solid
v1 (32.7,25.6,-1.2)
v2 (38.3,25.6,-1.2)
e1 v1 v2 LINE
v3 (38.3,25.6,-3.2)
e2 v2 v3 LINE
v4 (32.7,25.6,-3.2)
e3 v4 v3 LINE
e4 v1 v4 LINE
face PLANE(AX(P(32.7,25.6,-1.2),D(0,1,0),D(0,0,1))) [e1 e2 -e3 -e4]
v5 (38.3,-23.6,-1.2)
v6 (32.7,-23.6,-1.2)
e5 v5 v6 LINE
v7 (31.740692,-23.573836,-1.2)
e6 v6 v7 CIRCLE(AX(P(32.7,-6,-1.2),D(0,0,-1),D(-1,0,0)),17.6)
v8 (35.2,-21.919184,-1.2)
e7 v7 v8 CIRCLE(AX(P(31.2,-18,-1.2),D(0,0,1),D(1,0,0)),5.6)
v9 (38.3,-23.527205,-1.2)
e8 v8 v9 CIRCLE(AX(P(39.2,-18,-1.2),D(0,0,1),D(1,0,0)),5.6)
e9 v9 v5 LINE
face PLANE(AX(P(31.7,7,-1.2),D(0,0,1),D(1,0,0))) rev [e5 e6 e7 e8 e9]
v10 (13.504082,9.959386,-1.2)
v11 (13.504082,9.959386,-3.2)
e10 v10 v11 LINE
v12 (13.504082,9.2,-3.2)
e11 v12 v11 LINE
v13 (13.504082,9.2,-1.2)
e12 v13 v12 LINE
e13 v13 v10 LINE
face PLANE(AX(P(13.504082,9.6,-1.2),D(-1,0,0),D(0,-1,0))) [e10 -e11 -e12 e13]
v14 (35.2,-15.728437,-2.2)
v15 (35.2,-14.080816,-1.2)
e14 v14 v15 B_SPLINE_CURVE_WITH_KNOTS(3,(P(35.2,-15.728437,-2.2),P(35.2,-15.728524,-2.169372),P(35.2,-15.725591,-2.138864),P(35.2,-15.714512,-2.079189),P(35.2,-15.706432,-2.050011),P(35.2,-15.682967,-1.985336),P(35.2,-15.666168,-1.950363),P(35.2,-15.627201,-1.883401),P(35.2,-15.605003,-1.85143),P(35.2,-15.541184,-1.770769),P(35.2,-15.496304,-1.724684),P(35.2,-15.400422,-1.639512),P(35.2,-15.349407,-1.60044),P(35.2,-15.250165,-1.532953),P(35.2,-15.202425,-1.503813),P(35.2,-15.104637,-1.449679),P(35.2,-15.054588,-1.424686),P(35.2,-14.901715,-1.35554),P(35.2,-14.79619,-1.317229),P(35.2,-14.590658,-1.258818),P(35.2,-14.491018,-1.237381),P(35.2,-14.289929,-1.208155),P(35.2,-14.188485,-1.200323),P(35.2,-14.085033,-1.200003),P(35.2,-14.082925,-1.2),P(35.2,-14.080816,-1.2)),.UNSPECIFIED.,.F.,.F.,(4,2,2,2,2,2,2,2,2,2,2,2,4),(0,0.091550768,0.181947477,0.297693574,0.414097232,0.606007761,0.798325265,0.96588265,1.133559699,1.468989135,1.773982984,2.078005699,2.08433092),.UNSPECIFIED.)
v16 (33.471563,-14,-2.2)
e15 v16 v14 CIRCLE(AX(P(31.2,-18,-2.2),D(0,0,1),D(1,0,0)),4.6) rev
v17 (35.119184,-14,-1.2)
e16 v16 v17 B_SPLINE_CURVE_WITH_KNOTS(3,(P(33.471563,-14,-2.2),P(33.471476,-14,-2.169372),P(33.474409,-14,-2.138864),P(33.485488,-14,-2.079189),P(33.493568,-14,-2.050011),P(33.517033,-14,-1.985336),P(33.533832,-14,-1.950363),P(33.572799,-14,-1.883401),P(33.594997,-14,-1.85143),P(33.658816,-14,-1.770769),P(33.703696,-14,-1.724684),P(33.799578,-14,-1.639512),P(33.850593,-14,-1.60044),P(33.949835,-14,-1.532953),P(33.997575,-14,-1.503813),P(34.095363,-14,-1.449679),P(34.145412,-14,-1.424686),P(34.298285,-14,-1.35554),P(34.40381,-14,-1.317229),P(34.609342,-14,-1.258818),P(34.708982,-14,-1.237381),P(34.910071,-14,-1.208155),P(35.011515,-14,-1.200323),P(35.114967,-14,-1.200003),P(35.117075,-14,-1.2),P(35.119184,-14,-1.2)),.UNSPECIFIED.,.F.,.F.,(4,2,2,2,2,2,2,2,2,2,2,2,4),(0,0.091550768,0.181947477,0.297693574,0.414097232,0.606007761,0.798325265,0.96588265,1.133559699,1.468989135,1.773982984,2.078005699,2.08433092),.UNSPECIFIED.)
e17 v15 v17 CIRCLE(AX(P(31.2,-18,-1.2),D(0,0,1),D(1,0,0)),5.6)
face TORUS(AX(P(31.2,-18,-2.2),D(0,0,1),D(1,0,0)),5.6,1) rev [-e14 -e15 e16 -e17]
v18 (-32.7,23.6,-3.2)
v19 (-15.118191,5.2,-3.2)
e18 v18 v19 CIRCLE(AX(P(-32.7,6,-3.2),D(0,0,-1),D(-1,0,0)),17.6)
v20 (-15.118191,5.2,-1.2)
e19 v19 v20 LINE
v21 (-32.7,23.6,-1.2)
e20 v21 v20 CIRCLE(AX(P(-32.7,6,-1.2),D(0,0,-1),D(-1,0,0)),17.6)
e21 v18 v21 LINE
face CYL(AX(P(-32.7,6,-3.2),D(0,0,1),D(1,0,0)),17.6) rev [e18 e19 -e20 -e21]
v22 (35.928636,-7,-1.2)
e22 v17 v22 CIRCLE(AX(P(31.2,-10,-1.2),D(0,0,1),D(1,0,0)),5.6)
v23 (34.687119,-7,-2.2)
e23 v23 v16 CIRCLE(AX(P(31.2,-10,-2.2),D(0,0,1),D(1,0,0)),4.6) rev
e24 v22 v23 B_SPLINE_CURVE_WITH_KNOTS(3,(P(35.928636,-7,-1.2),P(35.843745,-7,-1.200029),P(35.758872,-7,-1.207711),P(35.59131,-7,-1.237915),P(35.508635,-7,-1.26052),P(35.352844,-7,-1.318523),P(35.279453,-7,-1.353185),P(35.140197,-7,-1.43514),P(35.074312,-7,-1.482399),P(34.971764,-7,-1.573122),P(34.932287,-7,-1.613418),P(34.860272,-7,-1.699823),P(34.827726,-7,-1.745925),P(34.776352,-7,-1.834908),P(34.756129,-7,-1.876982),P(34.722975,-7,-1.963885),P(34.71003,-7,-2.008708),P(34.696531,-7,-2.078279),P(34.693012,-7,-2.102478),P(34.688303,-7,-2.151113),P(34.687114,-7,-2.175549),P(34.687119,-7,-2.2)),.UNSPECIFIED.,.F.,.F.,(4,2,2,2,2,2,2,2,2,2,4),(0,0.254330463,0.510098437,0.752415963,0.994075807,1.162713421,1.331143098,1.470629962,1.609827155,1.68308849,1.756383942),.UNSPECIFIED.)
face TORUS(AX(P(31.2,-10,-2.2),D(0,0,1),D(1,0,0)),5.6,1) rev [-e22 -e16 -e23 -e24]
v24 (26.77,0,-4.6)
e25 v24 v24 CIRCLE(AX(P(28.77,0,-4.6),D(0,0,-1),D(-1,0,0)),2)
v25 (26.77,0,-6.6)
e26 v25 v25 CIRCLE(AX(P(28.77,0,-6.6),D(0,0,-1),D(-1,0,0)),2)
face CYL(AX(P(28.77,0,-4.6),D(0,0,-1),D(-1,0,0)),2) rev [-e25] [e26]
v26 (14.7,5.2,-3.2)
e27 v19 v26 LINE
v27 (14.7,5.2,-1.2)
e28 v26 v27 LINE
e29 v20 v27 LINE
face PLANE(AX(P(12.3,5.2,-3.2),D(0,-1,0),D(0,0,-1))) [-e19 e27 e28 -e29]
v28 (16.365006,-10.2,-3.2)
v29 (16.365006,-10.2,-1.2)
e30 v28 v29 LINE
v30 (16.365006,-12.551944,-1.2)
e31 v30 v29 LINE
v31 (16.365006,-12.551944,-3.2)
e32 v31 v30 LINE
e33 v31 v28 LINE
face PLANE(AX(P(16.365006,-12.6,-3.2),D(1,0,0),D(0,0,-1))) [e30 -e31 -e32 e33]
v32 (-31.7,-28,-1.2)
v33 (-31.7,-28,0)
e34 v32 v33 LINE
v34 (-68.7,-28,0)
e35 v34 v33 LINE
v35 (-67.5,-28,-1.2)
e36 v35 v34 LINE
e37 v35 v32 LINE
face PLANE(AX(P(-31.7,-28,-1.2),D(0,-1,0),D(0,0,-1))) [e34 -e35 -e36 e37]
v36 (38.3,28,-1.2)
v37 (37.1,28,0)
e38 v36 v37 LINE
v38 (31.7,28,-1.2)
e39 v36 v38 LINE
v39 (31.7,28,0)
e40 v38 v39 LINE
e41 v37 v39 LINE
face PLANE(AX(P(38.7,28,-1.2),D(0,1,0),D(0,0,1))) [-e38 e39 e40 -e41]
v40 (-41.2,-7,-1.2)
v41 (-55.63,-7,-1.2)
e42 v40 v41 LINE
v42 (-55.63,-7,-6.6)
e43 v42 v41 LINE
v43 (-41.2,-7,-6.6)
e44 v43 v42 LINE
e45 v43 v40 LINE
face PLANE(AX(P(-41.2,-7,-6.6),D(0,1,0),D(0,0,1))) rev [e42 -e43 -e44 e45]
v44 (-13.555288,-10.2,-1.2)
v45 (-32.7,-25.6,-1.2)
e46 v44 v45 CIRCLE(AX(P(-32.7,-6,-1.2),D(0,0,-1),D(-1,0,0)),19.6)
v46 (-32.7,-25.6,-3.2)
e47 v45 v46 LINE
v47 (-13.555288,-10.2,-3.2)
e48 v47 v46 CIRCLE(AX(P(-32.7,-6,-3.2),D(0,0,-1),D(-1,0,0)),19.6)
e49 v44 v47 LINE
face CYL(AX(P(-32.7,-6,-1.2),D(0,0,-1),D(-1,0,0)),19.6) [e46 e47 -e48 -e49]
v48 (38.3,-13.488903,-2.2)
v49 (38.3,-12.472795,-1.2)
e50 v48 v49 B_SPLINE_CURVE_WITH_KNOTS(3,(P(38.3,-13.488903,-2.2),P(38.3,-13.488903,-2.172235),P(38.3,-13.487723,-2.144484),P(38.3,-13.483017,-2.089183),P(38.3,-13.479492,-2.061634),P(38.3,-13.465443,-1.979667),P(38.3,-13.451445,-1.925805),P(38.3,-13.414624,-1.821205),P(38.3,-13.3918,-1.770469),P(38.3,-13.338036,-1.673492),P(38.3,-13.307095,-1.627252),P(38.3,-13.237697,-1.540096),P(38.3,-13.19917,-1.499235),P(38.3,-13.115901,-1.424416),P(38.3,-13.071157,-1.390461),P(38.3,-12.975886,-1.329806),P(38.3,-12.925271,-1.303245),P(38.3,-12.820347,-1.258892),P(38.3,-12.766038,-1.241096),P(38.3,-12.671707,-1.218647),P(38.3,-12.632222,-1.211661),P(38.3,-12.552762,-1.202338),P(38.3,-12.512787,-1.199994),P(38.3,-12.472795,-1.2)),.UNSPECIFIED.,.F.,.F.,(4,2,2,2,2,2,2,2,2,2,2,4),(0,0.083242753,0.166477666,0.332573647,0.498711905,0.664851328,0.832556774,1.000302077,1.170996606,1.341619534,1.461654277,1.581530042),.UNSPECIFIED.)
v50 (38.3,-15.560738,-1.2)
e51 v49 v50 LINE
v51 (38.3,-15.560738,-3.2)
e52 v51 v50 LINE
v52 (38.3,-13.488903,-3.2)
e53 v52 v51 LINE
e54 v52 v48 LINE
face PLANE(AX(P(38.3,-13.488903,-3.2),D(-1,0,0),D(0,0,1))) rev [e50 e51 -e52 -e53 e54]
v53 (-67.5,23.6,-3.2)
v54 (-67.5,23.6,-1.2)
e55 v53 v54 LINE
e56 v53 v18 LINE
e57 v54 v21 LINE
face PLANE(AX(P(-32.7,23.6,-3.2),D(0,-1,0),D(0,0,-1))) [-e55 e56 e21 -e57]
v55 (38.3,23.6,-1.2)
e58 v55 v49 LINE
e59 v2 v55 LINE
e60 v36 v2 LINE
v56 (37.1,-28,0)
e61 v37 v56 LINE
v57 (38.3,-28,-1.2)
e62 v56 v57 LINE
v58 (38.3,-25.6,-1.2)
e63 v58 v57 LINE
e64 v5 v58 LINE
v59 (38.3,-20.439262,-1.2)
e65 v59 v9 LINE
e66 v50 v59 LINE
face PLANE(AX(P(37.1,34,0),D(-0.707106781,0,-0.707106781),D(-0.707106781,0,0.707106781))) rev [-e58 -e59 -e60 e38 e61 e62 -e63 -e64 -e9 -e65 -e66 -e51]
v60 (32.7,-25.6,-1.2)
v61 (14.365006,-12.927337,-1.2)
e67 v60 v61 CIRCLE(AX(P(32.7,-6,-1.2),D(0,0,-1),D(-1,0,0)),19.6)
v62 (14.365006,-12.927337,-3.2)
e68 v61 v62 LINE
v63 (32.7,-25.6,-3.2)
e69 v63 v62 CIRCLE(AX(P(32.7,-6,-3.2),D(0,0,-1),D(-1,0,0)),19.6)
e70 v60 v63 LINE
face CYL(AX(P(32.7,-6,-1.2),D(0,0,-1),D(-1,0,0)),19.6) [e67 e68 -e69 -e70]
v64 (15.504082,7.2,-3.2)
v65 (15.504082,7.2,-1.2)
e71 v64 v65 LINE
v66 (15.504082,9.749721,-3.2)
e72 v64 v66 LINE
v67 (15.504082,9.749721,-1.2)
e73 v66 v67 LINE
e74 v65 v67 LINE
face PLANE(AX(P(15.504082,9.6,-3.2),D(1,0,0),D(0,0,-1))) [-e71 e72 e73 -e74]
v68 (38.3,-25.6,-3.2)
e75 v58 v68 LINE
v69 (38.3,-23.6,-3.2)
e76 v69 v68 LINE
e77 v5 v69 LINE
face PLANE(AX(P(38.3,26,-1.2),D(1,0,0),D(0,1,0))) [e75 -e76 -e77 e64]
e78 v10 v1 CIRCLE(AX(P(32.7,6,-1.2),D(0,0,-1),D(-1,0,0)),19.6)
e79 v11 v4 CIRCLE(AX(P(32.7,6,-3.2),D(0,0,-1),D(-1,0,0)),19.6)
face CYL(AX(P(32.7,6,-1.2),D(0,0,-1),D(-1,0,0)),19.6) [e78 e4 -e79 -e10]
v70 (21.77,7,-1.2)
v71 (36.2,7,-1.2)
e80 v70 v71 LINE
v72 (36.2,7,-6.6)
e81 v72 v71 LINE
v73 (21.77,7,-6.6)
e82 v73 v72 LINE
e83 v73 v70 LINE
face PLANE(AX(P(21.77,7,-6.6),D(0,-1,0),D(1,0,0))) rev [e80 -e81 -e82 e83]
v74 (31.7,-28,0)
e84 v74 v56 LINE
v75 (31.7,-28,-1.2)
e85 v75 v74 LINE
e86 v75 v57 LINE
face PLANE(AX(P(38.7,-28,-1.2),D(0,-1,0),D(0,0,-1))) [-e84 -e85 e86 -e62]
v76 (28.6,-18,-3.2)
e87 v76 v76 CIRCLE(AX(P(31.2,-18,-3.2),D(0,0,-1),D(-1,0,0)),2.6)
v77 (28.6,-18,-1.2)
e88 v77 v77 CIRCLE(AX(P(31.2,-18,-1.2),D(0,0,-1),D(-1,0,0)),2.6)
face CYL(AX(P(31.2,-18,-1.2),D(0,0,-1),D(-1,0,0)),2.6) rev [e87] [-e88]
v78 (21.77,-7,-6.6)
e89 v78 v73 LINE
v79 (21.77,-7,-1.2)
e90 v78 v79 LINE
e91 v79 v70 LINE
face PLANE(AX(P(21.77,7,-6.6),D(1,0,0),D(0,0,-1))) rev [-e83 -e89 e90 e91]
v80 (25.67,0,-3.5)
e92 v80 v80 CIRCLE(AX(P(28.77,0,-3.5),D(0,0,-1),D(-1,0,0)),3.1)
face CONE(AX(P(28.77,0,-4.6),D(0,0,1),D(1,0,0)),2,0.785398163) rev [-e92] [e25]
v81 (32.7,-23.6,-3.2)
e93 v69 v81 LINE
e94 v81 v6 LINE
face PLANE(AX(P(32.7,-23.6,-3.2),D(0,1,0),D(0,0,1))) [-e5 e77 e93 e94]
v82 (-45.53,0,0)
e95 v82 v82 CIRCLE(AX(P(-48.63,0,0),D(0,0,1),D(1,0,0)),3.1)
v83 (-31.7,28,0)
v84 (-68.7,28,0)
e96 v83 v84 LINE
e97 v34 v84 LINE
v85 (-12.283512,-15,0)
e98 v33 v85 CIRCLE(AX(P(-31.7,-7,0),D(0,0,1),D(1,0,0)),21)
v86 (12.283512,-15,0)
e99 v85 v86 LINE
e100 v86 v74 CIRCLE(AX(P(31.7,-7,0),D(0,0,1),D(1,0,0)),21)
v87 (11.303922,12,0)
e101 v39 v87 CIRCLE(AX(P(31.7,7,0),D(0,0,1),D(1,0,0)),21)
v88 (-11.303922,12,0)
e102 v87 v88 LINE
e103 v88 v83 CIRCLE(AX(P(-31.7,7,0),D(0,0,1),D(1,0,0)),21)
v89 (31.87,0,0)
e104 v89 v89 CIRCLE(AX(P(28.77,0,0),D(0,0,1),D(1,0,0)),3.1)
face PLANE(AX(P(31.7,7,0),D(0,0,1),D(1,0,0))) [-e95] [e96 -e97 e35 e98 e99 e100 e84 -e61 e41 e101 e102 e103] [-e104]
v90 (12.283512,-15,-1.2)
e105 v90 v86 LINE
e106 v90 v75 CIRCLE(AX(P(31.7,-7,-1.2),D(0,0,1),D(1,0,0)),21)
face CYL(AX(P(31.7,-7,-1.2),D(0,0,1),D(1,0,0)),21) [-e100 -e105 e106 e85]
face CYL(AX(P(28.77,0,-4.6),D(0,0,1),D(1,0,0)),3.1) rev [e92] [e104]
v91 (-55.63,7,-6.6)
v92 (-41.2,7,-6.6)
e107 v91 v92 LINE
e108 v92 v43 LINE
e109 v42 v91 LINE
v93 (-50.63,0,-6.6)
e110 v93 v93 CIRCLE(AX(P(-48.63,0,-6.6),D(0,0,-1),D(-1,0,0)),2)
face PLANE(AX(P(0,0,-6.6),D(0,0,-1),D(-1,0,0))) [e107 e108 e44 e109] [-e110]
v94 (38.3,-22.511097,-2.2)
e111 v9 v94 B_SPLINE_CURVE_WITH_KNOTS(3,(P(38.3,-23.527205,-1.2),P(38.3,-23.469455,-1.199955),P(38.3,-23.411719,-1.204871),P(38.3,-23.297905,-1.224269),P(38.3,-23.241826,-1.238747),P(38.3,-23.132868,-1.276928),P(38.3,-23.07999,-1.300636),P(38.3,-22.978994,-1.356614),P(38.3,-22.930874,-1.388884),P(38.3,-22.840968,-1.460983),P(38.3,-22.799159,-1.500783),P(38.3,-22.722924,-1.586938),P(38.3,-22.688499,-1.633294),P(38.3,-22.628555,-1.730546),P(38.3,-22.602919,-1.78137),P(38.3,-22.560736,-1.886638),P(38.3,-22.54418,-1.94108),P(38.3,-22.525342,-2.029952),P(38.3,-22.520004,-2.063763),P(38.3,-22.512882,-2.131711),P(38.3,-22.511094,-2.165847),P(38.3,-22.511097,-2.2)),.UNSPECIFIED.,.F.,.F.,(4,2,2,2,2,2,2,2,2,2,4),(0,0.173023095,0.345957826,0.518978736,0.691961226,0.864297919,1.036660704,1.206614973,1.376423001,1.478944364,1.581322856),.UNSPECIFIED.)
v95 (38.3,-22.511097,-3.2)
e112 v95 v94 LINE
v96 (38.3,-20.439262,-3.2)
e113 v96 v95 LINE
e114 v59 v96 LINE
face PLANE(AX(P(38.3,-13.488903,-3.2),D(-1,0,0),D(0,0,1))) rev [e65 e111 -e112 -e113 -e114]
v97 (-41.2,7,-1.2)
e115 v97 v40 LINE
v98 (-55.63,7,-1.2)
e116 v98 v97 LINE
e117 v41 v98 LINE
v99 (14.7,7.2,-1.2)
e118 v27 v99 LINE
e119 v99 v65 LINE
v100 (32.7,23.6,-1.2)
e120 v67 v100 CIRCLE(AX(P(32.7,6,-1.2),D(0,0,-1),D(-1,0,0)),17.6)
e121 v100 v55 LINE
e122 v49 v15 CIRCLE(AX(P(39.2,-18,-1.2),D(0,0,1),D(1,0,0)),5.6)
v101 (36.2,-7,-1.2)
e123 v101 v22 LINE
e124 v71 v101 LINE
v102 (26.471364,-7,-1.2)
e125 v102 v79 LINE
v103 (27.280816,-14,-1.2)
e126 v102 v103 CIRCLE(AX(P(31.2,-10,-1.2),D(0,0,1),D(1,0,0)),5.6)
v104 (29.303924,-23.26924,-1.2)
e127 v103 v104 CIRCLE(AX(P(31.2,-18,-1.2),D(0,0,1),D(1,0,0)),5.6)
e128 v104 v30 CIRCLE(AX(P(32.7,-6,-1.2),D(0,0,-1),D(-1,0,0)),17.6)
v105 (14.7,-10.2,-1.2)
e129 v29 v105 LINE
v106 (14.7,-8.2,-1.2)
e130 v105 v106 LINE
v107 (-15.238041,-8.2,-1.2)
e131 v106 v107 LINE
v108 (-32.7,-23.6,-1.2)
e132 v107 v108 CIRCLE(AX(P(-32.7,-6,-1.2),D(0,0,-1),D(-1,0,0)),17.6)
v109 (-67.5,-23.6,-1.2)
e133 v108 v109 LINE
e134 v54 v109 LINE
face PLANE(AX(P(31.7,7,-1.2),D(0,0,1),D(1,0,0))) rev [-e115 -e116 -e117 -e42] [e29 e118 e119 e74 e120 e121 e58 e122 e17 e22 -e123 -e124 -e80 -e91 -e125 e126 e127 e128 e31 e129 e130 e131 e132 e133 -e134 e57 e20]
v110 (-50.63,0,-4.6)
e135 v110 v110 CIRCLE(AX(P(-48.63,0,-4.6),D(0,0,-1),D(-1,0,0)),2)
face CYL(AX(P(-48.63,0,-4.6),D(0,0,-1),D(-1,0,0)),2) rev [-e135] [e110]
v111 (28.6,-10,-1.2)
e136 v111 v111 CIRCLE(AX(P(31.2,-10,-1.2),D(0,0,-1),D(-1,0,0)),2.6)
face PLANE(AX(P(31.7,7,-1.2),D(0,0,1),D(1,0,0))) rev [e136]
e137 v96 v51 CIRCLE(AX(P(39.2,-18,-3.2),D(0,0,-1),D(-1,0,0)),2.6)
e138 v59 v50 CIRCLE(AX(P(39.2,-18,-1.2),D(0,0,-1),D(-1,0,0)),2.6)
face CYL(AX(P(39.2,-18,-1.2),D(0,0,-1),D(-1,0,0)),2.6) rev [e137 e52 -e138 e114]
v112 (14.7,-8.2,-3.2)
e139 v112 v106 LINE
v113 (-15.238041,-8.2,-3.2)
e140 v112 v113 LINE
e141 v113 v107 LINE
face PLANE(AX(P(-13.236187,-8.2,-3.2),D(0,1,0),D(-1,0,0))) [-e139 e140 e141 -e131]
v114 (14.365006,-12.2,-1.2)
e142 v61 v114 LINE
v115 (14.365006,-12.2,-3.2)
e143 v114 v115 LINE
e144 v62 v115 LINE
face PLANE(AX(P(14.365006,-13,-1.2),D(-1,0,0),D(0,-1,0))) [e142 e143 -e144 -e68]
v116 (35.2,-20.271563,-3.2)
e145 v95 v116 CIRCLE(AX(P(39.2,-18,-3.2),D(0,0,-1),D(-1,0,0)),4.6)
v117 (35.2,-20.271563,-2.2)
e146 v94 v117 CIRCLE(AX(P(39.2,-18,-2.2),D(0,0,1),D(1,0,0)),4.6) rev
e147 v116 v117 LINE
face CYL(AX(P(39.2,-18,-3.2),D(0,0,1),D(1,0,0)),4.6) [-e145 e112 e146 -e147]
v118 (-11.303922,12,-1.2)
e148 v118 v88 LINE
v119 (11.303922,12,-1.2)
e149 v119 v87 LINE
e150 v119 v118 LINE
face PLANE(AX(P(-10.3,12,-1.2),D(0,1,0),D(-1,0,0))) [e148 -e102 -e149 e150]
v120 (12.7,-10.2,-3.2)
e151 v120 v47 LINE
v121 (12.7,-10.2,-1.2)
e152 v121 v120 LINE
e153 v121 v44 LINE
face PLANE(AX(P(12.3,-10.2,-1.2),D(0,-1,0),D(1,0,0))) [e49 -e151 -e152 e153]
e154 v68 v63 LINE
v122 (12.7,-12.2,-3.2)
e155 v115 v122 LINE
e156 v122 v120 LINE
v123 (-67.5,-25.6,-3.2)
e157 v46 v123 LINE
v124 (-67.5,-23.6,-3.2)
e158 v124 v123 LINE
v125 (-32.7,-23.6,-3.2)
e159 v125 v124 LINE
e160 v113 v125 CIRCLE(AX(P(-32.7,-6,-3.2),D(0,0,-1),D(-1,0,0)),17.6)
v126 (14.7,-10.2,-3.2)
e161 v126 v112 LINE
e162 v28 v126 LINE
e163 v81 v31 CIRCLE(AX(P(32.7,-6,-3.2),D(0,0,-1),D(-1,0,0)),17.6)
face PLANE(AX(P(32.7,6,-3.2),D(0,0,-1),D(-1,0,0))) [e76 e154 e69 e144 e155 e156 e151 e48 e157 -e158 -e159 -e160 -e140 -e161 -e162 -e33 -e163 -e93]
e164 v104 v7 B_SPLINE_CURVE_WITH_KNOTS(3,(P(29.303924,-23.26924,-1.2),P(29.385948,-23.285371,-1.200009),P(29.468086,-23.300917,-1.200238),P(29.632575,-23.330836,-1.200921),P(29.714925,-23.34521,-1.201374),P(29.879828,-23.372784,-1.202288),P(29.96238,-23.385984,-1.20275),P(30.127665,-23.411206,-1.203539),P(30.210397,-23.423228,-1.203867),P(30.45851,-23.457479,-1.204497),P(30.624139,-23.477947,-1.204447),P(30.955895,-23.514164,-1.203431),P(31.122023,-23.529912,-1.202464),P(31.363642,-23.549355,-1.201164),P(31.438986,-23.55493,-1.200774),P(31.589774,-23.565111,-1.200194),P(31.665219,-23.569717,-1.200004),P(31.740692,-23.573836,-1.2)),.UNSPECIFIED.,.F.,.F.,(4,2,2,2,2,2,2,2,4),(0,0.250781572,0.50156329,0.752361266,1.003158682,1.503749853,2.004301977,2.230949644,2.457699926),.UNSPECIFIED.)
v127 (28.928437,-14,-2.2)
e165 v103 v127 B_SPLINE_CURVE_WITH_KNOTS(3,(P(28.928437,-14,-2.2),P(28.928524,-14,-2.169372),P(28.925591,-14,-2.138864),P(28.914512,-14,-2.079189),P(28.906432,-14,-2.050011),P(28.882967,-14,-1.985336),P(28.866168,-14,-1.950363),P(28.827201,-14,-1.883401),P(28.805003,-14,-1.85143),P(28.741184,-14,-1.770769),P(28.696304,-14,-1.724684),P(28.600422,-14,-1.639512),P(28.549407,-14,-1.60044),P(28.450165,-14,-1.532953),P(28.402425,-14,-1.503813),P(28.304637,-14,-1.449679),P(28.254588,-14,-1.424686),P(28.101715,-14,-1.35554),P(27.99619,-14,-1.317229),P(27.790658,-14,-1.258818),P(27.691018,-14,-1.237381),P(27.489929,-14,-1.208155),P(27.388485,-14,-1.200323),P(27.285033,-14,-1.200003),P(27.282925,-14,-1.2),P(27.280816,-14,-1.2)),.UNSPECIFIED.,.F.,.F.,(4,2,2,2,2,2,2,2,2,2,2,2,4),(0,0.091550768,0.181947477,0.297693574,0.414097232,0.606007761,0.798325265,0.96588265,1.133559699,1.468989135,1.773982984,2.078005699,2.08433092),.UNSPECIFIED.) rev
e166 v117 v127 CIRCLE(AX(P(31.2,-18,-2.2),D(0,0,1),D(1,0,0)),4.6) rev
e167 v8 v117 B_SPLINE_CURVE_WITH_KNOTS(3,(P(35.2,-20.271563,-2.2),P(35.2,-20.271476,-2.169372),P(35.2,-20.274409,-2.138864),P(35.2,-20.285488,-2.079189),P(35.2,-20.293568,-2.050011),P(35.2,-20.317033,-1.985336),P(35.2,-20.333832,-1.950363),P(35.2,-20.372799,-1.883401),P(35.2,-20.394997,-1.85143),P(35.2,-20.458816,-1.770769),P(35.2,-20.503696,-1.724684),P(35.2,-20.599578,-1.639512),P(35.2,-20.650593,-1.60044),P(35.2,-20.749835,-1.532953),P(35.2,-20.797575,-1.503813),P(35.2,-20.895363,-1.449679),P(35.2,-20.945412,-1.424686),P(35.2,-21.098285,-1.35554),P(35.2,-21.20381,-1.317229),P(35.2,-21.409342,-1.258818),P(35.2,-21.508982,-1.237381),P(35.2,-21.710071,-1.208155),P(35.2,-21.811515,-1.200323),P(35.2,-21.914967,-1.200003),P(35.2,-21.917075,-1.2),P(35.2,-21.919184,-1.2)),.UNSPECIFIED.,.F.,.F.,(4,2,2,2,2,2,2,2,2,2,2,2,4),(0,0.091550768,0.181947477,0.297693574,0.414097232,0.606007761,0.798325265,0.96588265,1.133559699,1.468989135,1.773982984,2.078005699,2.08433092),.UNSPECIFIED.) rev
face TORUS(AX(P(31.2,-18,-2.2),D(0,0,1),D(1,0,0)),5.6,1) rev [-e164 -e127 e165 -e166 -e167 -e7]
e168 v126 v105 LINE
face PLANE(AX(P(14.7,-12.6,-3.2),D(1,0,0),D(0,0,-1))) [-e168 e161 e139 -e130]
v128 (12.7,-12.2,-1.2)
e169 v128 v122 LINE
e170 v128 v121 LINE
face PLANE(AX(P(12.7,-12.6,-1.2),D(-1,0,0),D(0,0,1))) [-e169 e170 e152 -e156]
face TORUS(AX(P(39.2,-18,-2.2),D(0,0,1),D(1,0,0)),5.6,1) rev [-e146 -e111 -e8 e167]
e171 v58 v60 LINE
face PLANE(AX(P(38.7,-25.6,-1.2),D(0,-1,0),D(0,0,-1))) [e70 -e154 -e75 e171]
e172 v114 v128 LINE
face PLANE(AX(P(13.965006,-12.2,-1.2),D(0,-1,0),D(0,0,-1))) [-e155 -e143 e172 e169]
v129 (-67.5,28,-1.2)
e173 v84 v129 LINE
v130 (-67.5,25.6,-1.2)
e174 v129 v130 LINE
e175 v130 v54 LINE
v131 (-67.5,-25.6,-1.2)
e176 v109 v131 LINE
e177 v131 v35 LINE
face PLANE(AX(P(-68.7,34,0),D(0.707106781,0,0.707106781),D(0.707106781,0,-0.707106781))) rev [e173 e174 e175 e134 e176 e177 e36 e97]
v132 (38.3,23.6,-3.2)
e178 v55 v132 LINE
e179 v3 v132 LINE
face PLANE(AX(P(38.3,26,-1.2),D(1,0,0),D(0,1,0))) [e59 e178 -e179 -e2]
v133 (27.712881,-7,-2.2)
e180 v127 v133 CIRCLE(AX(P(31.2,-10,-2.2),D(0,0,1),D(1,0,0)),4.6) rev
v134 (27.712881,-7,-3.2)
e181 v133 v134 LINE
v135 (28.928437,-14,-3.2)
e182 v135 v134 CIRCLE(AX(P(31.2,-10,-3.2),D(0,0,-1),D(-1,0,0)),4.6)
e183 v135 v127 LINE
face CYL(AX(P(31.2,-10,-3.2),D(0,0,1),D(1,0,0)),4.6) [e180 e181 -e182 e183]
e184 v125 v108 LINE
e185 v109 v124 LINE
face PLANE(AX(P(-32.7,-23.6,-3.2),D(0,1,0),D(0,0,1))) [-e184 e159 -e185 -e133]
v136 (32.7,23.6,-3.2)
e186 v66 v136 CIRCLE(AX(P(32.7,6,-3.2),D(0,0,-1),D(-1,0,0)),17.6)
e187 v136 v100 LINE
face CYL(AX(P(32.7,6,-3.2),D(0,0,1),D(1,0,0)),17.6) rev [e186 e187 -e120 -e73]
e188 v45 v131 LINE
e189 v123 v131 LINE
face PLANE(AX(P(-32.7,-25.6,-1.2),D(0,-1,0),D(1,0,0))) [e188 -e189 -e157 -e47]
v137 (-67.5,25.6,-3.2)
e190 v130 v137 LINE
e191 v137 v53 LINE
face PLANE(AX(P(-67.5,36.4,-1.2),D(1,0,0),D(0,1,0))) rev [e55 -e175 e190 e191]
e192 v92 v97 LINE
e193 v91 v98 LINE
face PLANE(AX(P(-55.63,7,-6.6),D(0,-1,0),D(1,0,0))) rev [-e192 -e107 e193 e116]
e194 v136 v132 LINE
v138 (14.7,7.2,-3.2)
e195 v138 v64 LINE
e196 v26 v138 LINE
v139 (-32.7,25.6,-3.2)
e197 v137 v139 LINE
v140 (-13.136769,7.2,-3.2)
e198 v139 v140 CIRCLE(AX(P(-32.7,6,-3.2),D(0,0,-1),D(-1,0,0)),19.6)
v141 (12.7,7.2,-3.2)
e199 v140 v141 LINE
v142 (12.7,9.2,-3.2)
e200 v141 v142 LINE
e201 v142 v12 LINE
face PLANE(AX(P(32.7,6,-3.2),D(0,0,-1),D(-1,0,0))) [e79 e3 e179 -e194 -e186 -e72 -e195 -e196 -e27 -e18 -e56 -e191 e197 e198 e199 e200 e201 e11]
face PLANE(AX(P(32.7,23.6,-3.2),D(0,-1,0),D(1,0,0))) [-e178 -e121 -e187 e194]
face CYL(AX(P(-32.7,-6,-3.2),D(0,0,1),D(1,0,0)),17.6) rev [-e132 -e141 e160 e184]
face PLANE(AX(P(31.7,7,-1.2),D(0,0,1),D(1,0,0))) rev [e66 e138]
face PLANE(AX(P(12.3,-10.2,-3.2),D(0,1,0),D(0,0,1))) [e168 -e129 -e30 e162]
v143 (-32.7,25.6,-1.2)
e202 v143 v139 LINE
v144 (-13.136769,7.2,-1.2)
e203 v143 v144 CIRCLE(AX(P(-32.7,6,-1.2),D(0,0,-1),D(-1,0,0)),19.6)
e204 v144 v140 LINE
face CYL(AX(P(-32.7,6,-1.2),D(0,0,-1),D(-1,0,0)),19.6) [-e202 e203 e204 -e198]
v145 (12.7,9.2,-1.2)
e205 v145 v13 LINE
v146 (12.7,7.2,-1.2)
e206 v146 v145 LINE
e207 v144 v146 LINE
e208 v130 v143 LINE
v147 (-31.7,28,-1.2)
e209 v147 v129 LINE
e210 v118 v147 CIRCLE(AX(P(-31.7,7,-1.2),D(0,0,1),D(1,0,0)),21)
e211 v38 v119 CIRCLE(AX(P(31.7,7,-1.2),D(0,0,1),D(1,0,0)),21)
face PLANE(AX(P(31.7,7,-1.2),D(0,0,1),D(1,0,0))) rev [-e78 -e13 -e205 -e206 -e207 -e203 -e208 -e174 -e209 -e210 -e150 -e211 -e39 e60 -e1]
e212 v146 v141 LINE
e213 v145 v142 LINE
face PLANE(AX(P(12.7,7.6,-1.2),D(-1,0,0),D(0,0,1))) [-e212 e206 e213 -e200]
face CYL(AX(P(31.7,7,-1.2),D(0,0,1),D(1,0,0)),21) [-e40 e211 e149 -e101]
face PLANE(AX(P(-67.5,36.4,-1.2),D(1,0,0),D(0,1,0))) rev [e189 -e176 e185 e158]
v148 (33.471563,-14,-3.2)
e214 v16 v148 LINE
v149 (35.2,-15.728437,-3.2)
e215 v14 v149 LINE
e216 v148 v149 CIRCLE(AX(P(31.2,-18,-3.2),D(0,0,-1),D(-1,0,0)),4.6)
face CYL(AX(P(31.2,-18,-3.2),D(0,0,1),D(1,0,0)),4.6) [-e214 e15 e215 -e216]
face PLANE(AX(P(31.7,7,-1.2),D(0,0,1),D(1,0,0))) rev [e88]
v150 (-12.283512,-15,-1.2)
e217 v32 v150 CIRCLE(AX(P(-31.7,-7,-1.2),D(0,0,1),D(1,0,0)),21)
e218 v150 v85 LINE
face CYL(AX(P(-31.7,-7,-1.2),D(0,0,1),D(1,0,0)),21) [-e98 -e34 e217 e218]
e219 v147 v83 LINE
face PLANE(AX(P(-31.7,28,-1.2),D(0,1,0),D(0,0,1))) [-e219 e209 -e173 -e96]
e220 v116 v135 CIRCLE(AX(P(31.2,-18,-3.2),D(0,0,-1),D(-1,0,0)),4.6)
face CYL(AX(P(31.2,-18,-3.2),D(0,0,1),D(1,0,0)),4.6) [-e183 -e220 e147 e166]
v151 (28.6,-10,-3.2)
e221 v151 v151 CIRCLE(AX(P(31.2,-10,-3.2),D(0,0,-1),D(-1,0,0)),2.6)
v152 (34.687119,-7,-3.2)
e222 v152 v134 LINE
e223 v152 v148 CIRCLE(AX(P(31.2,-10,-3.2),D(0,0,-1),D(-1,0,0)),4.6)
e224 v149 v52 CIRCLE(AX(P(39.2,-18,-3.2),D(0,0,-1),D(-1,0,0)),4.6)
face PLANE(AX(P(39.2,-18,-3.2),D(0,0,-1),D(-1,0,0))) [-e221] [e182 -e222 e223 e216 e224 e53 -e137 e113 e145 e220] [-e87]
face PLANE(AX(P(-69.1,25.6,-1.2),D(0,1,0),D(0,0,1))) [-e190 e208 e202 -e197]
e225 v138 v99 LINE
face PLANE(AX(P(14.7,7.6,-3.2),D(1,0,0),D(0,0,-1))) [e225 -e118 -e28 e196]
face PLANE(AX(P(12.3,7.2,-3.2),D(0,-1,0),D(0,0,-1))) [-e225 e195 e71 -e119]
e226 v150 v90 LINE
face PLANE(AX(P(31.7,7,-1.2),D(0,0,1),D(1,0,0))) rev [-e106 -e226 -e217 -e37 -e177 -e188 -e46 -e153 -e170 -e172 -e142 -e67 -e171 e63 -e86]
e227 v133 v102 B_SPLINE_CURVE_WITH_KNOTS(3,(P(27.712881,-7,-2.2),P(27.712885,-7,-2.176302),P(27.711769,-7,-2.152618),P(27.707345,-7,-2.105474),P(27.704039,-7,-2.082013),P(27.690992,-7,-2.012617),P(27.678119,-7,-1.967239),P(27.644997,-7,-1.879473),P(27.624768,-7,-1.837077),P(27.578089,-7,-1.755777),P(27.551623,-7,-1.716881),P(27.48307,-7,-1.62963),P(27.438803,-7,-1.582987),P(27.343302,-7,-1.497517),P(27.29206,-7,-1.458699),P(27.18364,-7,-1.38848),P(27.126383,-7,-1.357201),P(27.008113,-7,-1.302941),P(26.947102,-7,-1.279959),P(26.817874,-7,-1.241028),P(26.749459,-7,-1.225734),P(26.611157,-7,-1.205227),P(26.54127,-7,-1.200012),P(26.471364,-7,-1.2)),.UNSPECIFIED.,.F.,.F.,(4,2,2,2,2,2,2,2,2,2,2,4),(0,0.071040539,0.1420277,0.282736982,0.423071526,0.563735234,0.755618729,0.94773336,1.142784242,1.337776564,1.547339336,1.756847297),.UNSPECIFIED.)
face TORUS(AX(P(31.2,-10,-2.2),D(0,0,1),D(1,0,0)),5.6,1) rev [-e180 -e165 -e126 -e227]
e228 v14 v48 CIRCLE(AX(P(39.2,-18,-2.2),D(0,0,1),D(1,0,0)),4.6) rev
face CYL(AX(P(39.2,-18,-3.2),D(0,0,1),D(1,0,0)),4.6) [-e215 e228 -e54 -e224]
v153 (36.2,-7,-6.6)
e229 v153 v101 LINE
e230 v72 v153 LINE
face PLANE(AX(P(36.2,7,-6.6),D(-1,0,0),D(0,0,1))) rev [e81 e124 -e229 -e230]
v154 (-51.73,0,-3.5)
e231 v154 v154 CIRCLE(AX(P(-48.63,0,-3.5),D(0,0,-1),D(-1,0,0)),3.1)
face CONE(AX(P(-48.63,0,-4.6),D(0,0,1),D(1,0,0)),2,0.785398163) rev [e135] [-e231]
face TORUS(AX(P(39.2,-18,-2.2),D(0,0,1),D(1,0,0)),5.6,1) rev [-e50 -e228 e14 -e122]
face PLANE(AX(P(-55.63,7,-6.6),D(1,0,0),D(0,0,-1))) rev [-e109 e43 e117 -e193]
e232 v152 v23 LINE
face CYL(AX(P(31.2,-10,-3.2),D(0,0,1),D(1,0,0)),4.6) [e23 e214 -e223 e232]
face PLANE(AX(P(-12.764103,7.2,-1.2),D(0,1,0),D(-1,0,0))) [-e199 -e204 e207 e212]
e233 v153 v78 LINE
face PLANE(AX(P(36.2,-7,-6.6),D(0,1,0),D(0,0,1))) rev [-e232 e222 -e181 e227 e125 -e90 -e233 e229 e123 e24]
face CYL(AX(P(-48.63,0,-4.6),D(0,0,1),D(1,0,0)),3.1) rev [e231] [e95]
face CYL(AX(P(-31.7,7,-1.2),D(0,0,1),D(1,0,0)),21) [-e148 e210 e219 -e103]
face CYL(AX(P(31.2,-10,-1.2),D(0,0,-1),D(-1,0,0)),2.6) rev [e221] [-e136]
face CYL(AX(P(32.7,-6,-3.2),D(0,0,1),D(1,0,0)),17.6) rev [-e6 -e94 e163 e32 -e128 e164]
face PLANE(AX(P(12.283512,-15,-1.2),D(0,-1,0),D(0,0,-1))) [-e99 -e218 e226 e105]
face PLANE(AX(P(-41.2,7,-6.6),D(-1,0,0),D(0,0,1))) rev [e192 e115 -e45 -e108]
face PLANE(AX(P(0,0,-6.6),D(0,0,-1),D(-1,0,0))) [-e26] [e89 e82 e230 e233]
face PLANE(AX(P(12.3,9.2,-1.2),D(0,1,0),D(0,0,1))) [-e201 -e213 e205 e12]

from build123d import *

# Parameters (mm, degrees)
SKETCH_2_R            = 2.6
EXTRUDE_1_DEPTH       = 1.2
EXTRUDE_1_2_DEPTH     = 2
CUT_EXTRUDE_START     = -2
CUT_EXTRUDE_1_DEPTH   = 2
SKETCH_5_W            = 2
SKETCH_5_H            = 47.2
CUT_EXTRUDE_1_2_DEPTH = 2
SKETCH_6_W            = 14.43
SKETCH_6_H            = 14
SKETCH_6_R            = 2.6
EXTRUDE_2_DEPTH       = 5.4
SKETCH_7_R            = 3
SKETCH_7_R_2          = 2
EXTRUDE_2_2_DEPTH     = 2
SKETCH_8_R            = 3.1
CUT_EXTRUDE_2_DEPTH   = 4.6
CHAMFER_1_SIZE        = 1.1
SKETCH_10_R           = 4.6
SKETCH_10_R_2         = 2
EXTRUDE_3_DEPTH       = 2
SKETCH_11_R           = 2.6
SKETCH_11_R_2         = 2
CUT_EXTRUDE_2_2_DEPTH = 2
CUT_EXTRUDE_3_DEPTH   = 62
SKETCH_13_W           = 1.2
SKETCH_13_H           = 2
CUT_EXTRUDE_4_DEPTH   = 62
CUT_EXTRUDE_5_DEPTH   = 62
CUT_EXTRUDE_6_DEPTH   = 2
FILLET_1_R            = 1


# Read off the part's stored shape, not the designer's step: Вытянуть-Тонкостенный1
# Some blends are built 0.0001 mm under size
with BuildPart() as part:
    # Эскиз2 → Extrude 1 (new body)
    with BuildSketch(Plane.XY):
        with BuildLine():
            Line((-31.7, 28), (-69.1, 28))
            Line((-69.1, 28), (-69.1, -28))
            Line((-69.1, -28), (-31.7, -28))
            ThreePointArc((-31.7, -28), (-20.016678554, -24.449928367), (-12.283512161, -15))
            Line((-12.283512161, -15), (-10.3, -15))
            Line((-10.3, -15), (12.283512161, -15))
            ThreePointArc((12.283512161, -15), (20.016678554, -24.449928367), (31.7, -28))
            Line((31.7, -28), (38.7, -28))
            Line((38.7, -28), (38.7, 0))
            Line((38.7, 0), (38.7, 28))
            Line((38.7, 28), (31.7, 28))
            ThreePointArc((31.7, 28), (18.738518603, 23.522711642), (11.303921946, 12))
            Line((11.303921946, 12), (-10.3, 12))
            Line((-10.3, 12), (-11.303921946, 12))
            ThreePointArc((-11.303921946, 12), (-18.738518603, 23.522711642), (-31.7, 28))
        make_face()
        with Locations((28.77, 0)):
            Circle(SKETCH_2_R, mode=Mode.SUBTRACT)
        with Locations((-48.63, 0)):
            Circle(SKETCH_2_R, mode=Mode.SUBTRACT)
    extrude(amount=-EXTRUDE_1_DEPTH)

    # Extrude 1 2 outline → Extrude 1 2 (add)
    with BuildSketch(Plane(origin=(0, 0, -1.2), x_dir=(-1, 0, 0), z_dir=(0, 0, -1))):
        with BuildLine():
            Line((-32.7, 26), (-38.7, 26))
            Line((-38.7, 26), (-38.7, -26))
            Line((-38.7, -26), (-32.7, -26))
            ThreePointArc((-32.7, -26), (-21.298245749, -22.431676725), (-13.965006005, -13))
            Line((-13.965006005, -13), (-13.965006005, -12.6))
            Line((-13.965006005, -12.6), (-12.3, -12.6))
            Line((-12.3, -12.6), (-12.3, -10.6))
            Line((-12.3, -10.6), (13.236187424, -10.6))
            ThreePointArc((13.236187424, -10.6), (20.290326354, -21.684387141), (32.7, -26))
            Line((32.7, -26), (69.1, -26))
            Line((69.1, -26), (69.1, 26))
            Line((69.1, 26), (32.7, 26))
            ThreePointArc((32.7, 26), (19.135340034, 20.696938457), (12.764102729, 7.6))
            Line((12.764102729, 7.6), (-12.3, 7.6))
            Line((-12.3, 7.6), (-12.3, 9.6))
            Line((-12.3, 9.6), (-13.104082058, 9.6))
            Line((-13.104082058, 9.6), (-13.104082058, 10))
            ThreePointArc((-13.104082058, 10), (-20.050889359, 21.491933385), (-32.7, 26))
        make_face()
        with BuildLine():
            Line((-36.3, 23.6), (-32.7, 23.6))
            ThreePointArc((-32.7, 23.6), (-21.659961191, 19.706842929), (-15.504082058, 9.749720806))
            Line((-15.504082058, 9.749720806), (-15.504082058, 7.2))
            Line((-15.504082058, 7.2), (-14.7, 7.2))
            Line((-14.7, 7.2), (-14.7, 5.2))
            Line((-14.7, 5.2), (15.118191219, 5.2))
            ThreePointArc((15.118191219, 5.2), (19.975221024, 18.158947323), (32.7, 23.6))
            Line((32.7, 23.6), (66.7, 23.6))
            Line((66.7, 23.6), (66.7, -23.6))
            Line((66.7, -23.6), (32.7, -23.6))
            ThreePointArc((32.7, -23.6), (21.058694231, -19.2), (15.238041347, -8.2))
            Line((15.238041347, -8.2), (-14.7, -8.2))
            Line((-14.7, -8.2), (-14.7, -10.2))
            Line((-14.7, -10.2), (-16.365006005, -10.2))
            Line((-16.365006005, -10.2), (-16.365006005, -12.551944076))
            ThreePointArc((-16.365006005, -12.551944076), (-22.839833058, -20.578652471), (-32.7, -23.6))
            Line((-32.7, -23.6), (-36.3, -23.6))
            Line((-36.3, -23.6), (-36.3, 23.6))
        make_face(mode=Mode.SUBTRACT)
    extrude(amount=EXTRUDE_1_2_DEPTH)

    # Эскиз4 → Cut-Extrude 1 (cut)
    with BuildSketch(Plane(origin=(0, 0, -3.2), x_dir=(-1, 0, 0), z_dir=(0, 0, -1)).offset(CUT_EXTRUDE_START)):
        with BuildLine():
            Line((12.764102729, 7.6), (-12.3, 7.6))
            Line((-12.3, 7.6), (-12.3, 9.6))
            Line((-12.3, 9.6), (-13.104082058, 9.6))
            Line((-13.104082058, 9.6), (-13.104082058, 10))
            ThreePointArc((-13.104082058, 10), (-20.050889359, 21.491933385), (-32.7, 26))
            Line((-32.7, 26), (-38.7, 26))
            Line((-38.7, 26), (-38.7, -26))
            Line((-38.7, -26), (-32.7, -26))
            ThreePointArc((-32.7, -26), (-21.298245749, -22.431676725), (-13.965006005, -13))
            Line((-13.965006005, -13), (-13.965006005, -12.6))
            Line((-13.965006005, -12.6), (-12.3, -12.6))
            Line((-12.3, -12.6), (-12.3, -10.6))
            Line((-12.3, -10.6), (13.236187424, -10.6))
            ThreePointArc((13.236187424, -10.6), (20.290326354, -21.684387141), (32.7, -26))
            Line((32.7, -26), (69.1, -26))
            Line((69.1, -26), (69.1, 26))
            Line((69.1, 26), (32.7, 26))
            ThreePointArc((32.7, 26), (19.135340034, 20.696938457), (12.764102729, 7.6))
        make_face()
        with BuildLine():
            Line((13.136769183, 7.2), (-12.7, 7.2))
            Line((-12.7, 7.2), (-12.7, 9.2))
            Line((-12.7, 9.2), (-13.504082058, 9.2))
            Line((-13.504082058, 9.2), (-13.504082058, 9.959385603))
            ThreePointArc((-13.504082058, 9.959385603), (-20.319449887, 21.194801049), (-32.7, 25.6))
            Line((-32.7, 25.6), (-38.3, 25.6))
            Line((-38.3, 25.6), (-38.3, -25.6))
            Line((-38.3, -25.6), (-32.7, -25.6))
            ThreePointArc((-32.7, -25.6), (-21.555849098, -22.123520108), (-14.365006005, -12.927336804))
            Line((-14.365006005, -12.927336804), (-14.365006005, -12.2))
            Line((-14.365006005, -12.2), (-12.7, -12.2))
            Line((-12.7, -12.2), (-12.7, -10.2))
            Line((-12.7, -10.2), (13.555287936, -10.2))
            ThreePointArc((13.555287936, -10.2), (20.415049858, -21.27219696), (32.7, -25.6))
            Line((32.7, -25.6), (68.7, -25.6))
            Line((68.7, -25.6), (68.7, 25.6))
            Line((68.7, 25.6), (32.7, 25.6))
            ThreePointArc((32.7, 25.6), (19.271671735, 20.277254638), (13.136769183, 7.2))
        make_face(mode=Mode.SUBTRACT)
    extrude(amount=CUT_EXTRUDE_1_DEPTH, mode=Mode.SUBTRACT)

    # Эскиз5 → Cut-Extrude 1 2 (cut)
    with BuildSketch(Plane(origin=(0, 0, -3.2), x_dir=(-1, 0, 0), z_dir=(0, 0, -1))):
        with Locations((67.7, 0)):
            Rectangle(SKETCH_5_W, SKETCH_5_H)
        with Locations((-37.3, 0)):
            Rectangle(SKETCH_5_W, SKETCH_5_H)
    extrude(amount=-CUT_EXTRUDE_1_2_DEPTH, mode=Mode.SUBTRACT)

    # Эскиз6 → Extrude 2 (add)
    # profile 1 of 2: a face of its own
    with BuildSketch(Plane(origin=(0, 0, -1.2), x_dir=(-1, 0, 0), z_dir=(0, 0, -1))):
        with Locations((-28.985, 0)):
            Rectangle(SKETCH_6_W, SKETCH_6_H)
        with Locations(Location((-28.77, 0, 0), (0, 0, 180))):
            Circle(SKETCH_6_R, mode=Mode.SUBTRACT)
    # profile 2 of 2: a face of its own
    with BuildSketch(Plane(origin=(0, 0, -1.2), x_dir=(-1, 0, 0), z_dir=(0, 0, -1))):
        with Locations((48.415, 0)):
            Rectangle(SKETCH_6_W, SKETCH_6_H)
        with Locations(Location((48.63, 0, 0), (0, 0, 180))):
            Circle(SKETCH_6_R, mode=Mode.SUBTRACT)
    extrude(amount=EXTRUDE_2_DEPTH)

    # Эскиз7 → Extrude 2 2 (add)
    # profile 1 of 2: a face of its own
    with BuildSketch(Plane(origin=(0, 0, -6.6), x_dir=(-1, 0, 0), z_dir=(0, 0, -1))):
        with Locations((-28.77, 0)):
            Circle(SKETCH_7_R)
        with Locations((-28.77, 0)):
            Circle(SKETCH_7_R_2, mode=Mode.SUBTRACT)
    # profile 2 of 2: a face of its own
    with BuildSketch(Plane(origin=(0, 0, -6.6), x_dir=(-1, 0, 0), z_dir=(0, 0, -1))):
        with Locations((48.63, 0)):
            Circle(SKETCH_7_R)
        with Locations((48.63, 0)):
            Circle(SKETCH_7_R_2, mode=Mode.SUBTRACT)
    extrude(amount=-EXTRUDE_2_2_DEPTH)

    # Эскиз8 → Cut-Extrude 2 (cut)
    with BuildSketch(Plane.XY):
        with Locations((-48.63, 0)):
            Circle(SKETCH_8_R)
        with Locations((28.77, 0)):
            Circle(SKETCH_8_R)
    extrude(amount=-CUT_EXTRUDE_2_DEPTH, mode=Mode.SUBTRACT)

    # Фаска1
    chamfer_1_edges = [part.edges().sort_by_distance(p)[0] for p in [
        (-51.73, 0, -4.6),
        (25.67, 0, -4.6),
    ]]
    chamfer(chamfer_1_edges, length=CHAMFER_1_SIZE - 0.0001)  # a hair under: the kernel refuses the full size

    # Эскиз10 → Вытянуть-Тонкостенный3 (add)
    # profile 1 of 3: a face of its own
    with BuildSketch(Plane(origin=(0, 0, -1.2), x_dir=(-1, 0, 0), z_dir=(0, 0, -1))):
        with Locations((-39.2, -18)):
            Circle(SKETCH_10_R)
        with Locations((-39.2, -18)):
            Circle(SKETCH_10_R_2, mode=Mode.SUBTRACT)
    # profile 2 of 3: a face of its own
    with BuildSketch(Plane(origin=(0, 0, -1.2), x_dir=(-1, 0, 0), z_dir=(0, 0, -1))):
        with Locations((-31.2, -18)):
            Circle(SKETCH_10_R)
        with Locations((-31.2, -18)):
            Circle(SKETCH_10_R_2, mode=Mode.SUBTRACT)
    # profile 3 of 3: a face of its own
    with BuildSketch(Plane(origin=(0, 0, -1.2), x_dir=(-1, 0, 0), z_dir=(0, 0, -1))):
        with Locations((-31.2, -10)):
            Circle(SKETCH_10_R)
        with Locations((-31.2, -10)):
            Circle(SKETCH_10_R_2, mode=Mode.SUBTRACT)
    extrude(amount=EXTRUDE_3_DEPTH)

    # Эскиз11 → Cut-Extrude 2 2 (cut)
    # profile 1 of 3: a face of its own
    with BuildSketch(Plane(origin=(0, 0, -3.2), x_dir=(-1, 0, 0), z_dir=(0, 0, -1)).offset(CUT_EXTRUDE_START)):
        with Locations((-39.2, -18)):
            Circle(SKETCH_11_R)
        with Locations((-39.2, -18)):
            Circle(SKETCH_11_R_2, mode=Mode.SUBTRACT)
    # profile 2 of 3: a face of its own
    with BuildSketch(Plane(origin=(0, 0, -3.2), x_dir=(-1, 0, 0), z_dir=(0, 0, -1)).offset(CUT_EXTRUDE_START)):
        with Locations((-31.2, -18)):
            Circle(SKETCH_11_R)
        with Locations((-31.2, -18)):
            Circle(SKETCH_11_R_2, mode=Mode.SUBTRACT)
    # profile 3 of 3: a face of its own
    with BuildSketch(Plane(origin=(0, 0, -3.2), x_dir=(-1, 0, 0), z_dir=(0, 0, -1)).offset(CUT_EXTRUDE_START)):
        with Locations((-31.2, -10)):
            Circle(SKETCH_11_R)
        with Locations((-31.2, -10)):
            Circle(SKETCH_11_R_2, mode=Mode.SUBTRACT)
    extrude(amount=CUT_EXTRUDE_2_2_DEPTH, mode=Mode.SUBTRACT)

    # Эскиз12 → Вырез-Вытянуть3 (cut)
    with BuildSketch(Plane.XZ.offset(28)):
        Polygon((-68.7, 0), (-67.5, -1.2), (-69.1, -1.2), (-69.1, 0), align=None)
    extrude(amount=-CUT_EXTRUDE_3_DEPTH, mode=Mode.SUBTRACT)

    # Эскиз13 → Вырез-Вытянуть4 (cut)
    with BuildSketch(Plane.XZ.offset(25.6)):
        with Locations((-68.1, -2.2)):
            Rectangle(SKETCH_13_W, SKETCH_13_H)
    extrude(amount=-CUT_EXTRUDE_4_DEPTH, mode=Mode.SUBTRACT)

    # Эскиз14 → Вырез-Вытянуть5 (cut)
    with BuildSketch(Plane.XZ.offset(28)):
        Polygon((38.7, -1.2), (38.7, 0), (37.1, 0), (38.3, -1.2), align=None)
    extrude(amount=-CUT_EXTRUDE_5_DEPTH, mode=Mode.SUBTRACT)

    # Эскиз15 → Вырез-Вытянуть6 (cut)
    with BuildSketch(Plane.XY.offset(-1.2)):
        with BuildLine():
            Line((38.3, -13.488902573), (38.3, -22.511097427))
            ThreePointArc((38.3, -22.511097427), (43.8, -18), (38.3, -13.488902573))
        make_face()
    extrude(amount=-CUT_EXTRUDE_6_DEPTH, mode=Mode.SUBTRACT)

    # Скругление1
    # the kernel refuses this fillet: 1 mm, written as the material it adds along each edge
    with BuildSketch(Plane(origin=(31.2, -10, -1.2), x_dir=(-0.3113315217302437, 0.9503013646086861, 0), z_dir=(0.9503013646086861, 0.3113315217302437, 0))) as fillet_1_piece_1_section:
        with BuildLine():
            CenterArc((4.6 + FILLET_1_R, -FILLET_1_R), FILLET_1_R, 90, 90)
            Line((4.6, -FILLET_1_R), (4.6, 0))
            Line((4.6, 0), (4.6 + FILLET_1_R, 0))
        make_face()
    fillet_1_piece_1 = revolve(axis=Axis((31.2, -10, -1.2), (0, 0, 1)), revolution_arc=163.423462372, mode=Mode.PRIVATE)
    fillet_1_piece_1 = fillet_1_piece_1 - Plane(origin=(31.2, -18, -1.484354145), x_dir=(-1, 0, 0), z_dir=(0, 0, 1)) * Cylinder(4.6, 23, mode=Mode.PRIVATE)
    add(fillet_1_piece_1)
    with BuildSketch(Plane(origin=(31.2, -10, -1.2), x_dir=(-0.027275325587206686, -0.9996279590998403, 0), z_dir=(-0.9996279590998403, 0.027275325587206686, 0))) as fillet_1_piece_2_section:
        with BuildLine():
            CenterArc((4.6 + FILLET_1_R, -FILLET_1_R), FILLET_1_R, 90, 90)
            Line((4.6, -FILLET_1_R), (4.6, 0))
            Line((4.6, 0), (4.6 + FILLET_1_R, 0))
        make_face()
    fillet_1_piece_2 = revolve(axis=Axis((31.2, -10, -1.2), (0, 0, 1)), revolution_arc=163.423462372, mode=Mode.PRIVATE)
    fillet_1_piece_2 = fillet_1_piece_2 - Plane(origin=(31.2, -18, -1.484354149), x_dir=(-1, 0, 0), z_dir=(0, 0, 1)) * Cylinder(4.6, 23, mode=Mode.PRIVATE)
    add(fillet_1_piece_2)
    with BuildSketch(Plane(origin=(39.2, -18, -1.2), x_dir=(-0.999633679916253, -0.02706484762732944, 0), z_dir=(0.02706484762732944, -0.999633679916253, 0))) as fillet_1_piece_3_section:
        with BuildLine():
            CenterArc((4.6 + FILLET_1_R, FILLET_1_R), FILLET_1_R, 180, 90)
            Line((4.6, FILLET_1_R), (4.6, 0))
            Line((4.6, 0), (4.6 + FILLET_1_R, 0))
        make_face()
    fillet_1_piece_3 = revolve(axis=Axis((39.2, -18, -1.2), (0, 0, -1)), revolution_arc=111.410803348, mode=Mode.PRIVATE)
    fillet_1_piece_3 = split(fillet_1_piece_3, bisect_by=Plane(origin=(38.3, -14.154293852, -1.420542647), z_dir=(-1, 0, 0)), keep=Keep.TOP, mode=Mode.PRIVATE)
    fillet_1_piece_3 = fillet_1_piece_3 - Plane(origin=(31.2, -18, -1.420542647), x_dir=(-1, 0, 0), z_dir=(0, 0, 1)) * Cylinder(4.6, 23, mode=Mode.PRIVATE)
    add(fillet_1_piece_3)
    with BuildSketch(Plane(origin=(31.2, -18, -1.2), x_dir=(0.9996347466688221, -0.027025418634317382, 0), z_dir=(-0.027025418634317382, -0.9996347466688221, 0))) as fillet_1_piece_4_section:
        with BuildLine():
            CenterArc((4.6 + FILLET_1_R, -FILLET_1_R), FILLET_1_R, 90, 90)
            Line((4.6, -FILLET_1_R), (4.6, 0))
            Line((4.6, 0), (4.6 + FILLET_1_R, 0))
        make_face()
    fillet_1_piece_4 = revolve(axis=Axis((31.2, -18, -1.2), (0, 0, 1)), revolution_arc=93.097261959, mode=Mode.PRIVATE)
    fillet_1_piece_4 = fillet_1_piece_4 - Plane(origin=(31.2, -10, -1.427452975), x_dir=(-1, 0, 0), z_dir=(0, 0, 1)) * Cylinder(4.6, 23, mode=Mode.PRIVATE)
    fillet_1_piece_4 = fillet_1_piece_4 - Plane(origin=(39.2, -18, -1.427452975), x_dir=(-1, 0, 0), z_dir=(0, 0, 1)) * Cylinder(4.6, 23, mode=Mode.PRIVATE)
    add(fillet_1_piece_4)
    with BuildSketch(Plane(origin=(31.2, -18, -1.2), x_dir=(0.028198782541565014, 0.9996023352629653, 0), z_dir=(0.9996023352629653, -0.028198782541565014, 0))) as fillet_1_piece_5_section:
        with BuildLine():
            CenterArc((4.6 + FILLET_1_R, -FILLET_1_R), FILLET_1_R, 90, 90)
            Line((4.6, -FILLET_1_R), (4.6, 0))
            Line((4.6, 0), (4.6 + FILLET_1_R, 0))
        make_face()
    fillet_1_piece_5 = revolve(axis=Axis((31.2, -18, -1.2), (0, 0, 1)), revolution_arc=273.231770853, mode=Mode.PRIVATE)
    fillet_1_piece_5 = fillet_1_piece_5 - Plane(origin=(39.2, -18, -1.481900137), x_dir=(-1, 0, 0), z_dir=(0, 0, 1)) * Cylinder(2.6, 23, mode=Mode.PRIVATE)
    fillet_1_piece_5 = fillet_1_piece_5 - Plane(origin=(31.2, -10, -1.481900137), x_dir=(-1, 0, 0), z_dir=(0, 0, 1)) * Cylinder(4.6, 23, mode=Mode.PRIVATE)
    add(fillet_1_piece_5)
    with BuildSketch(Plane(origin=(39.2, -18, -1.2), x_dir=(0.33972158483368087, -0.9405260468472375, 0), z_dir=(0.9405260468472375, 0.33972158483368087, 0))) as fillet_1_piece_6_section:
        with BuildLine():
            CenterArc((4.6 + FILLET_1_R, FILLET_1_R), FILLET_1_R, 180, 90)
            Line((4.6, FILLET_1_R), (4.6, 0))
            Line((4.6, 0), (4.6 + FILLET_1_R, 0))
        make_face()
    fillet_1_piece_6 = revolve(axis=Axis((39.2, -18, -1.2), (0, 0, -1)), revolution_arc=111.410803348, mode=Mode.PRIVATE)
    fillet_1_piece_6 = split(fillet_1_piece_6, bisect_by=Plane(origin=(38.3, -21.84570589, -1.420542541), z_dir=(-1, 0, 0)), keep=Keep.TOP, mode=Mode.PRIVATE)
    fillet_1_piece_6 = fillet_1_piece_6 - Plane(origin=(31.2, -18, -1.420542541), x_dir=(-1, 0, 0), z_dir=(0, 0, 1)) * Cylinder(4.6, 23, mode=Mode.PRIVATE)
    add(fillet_1_piece_6)


solid = part.part
